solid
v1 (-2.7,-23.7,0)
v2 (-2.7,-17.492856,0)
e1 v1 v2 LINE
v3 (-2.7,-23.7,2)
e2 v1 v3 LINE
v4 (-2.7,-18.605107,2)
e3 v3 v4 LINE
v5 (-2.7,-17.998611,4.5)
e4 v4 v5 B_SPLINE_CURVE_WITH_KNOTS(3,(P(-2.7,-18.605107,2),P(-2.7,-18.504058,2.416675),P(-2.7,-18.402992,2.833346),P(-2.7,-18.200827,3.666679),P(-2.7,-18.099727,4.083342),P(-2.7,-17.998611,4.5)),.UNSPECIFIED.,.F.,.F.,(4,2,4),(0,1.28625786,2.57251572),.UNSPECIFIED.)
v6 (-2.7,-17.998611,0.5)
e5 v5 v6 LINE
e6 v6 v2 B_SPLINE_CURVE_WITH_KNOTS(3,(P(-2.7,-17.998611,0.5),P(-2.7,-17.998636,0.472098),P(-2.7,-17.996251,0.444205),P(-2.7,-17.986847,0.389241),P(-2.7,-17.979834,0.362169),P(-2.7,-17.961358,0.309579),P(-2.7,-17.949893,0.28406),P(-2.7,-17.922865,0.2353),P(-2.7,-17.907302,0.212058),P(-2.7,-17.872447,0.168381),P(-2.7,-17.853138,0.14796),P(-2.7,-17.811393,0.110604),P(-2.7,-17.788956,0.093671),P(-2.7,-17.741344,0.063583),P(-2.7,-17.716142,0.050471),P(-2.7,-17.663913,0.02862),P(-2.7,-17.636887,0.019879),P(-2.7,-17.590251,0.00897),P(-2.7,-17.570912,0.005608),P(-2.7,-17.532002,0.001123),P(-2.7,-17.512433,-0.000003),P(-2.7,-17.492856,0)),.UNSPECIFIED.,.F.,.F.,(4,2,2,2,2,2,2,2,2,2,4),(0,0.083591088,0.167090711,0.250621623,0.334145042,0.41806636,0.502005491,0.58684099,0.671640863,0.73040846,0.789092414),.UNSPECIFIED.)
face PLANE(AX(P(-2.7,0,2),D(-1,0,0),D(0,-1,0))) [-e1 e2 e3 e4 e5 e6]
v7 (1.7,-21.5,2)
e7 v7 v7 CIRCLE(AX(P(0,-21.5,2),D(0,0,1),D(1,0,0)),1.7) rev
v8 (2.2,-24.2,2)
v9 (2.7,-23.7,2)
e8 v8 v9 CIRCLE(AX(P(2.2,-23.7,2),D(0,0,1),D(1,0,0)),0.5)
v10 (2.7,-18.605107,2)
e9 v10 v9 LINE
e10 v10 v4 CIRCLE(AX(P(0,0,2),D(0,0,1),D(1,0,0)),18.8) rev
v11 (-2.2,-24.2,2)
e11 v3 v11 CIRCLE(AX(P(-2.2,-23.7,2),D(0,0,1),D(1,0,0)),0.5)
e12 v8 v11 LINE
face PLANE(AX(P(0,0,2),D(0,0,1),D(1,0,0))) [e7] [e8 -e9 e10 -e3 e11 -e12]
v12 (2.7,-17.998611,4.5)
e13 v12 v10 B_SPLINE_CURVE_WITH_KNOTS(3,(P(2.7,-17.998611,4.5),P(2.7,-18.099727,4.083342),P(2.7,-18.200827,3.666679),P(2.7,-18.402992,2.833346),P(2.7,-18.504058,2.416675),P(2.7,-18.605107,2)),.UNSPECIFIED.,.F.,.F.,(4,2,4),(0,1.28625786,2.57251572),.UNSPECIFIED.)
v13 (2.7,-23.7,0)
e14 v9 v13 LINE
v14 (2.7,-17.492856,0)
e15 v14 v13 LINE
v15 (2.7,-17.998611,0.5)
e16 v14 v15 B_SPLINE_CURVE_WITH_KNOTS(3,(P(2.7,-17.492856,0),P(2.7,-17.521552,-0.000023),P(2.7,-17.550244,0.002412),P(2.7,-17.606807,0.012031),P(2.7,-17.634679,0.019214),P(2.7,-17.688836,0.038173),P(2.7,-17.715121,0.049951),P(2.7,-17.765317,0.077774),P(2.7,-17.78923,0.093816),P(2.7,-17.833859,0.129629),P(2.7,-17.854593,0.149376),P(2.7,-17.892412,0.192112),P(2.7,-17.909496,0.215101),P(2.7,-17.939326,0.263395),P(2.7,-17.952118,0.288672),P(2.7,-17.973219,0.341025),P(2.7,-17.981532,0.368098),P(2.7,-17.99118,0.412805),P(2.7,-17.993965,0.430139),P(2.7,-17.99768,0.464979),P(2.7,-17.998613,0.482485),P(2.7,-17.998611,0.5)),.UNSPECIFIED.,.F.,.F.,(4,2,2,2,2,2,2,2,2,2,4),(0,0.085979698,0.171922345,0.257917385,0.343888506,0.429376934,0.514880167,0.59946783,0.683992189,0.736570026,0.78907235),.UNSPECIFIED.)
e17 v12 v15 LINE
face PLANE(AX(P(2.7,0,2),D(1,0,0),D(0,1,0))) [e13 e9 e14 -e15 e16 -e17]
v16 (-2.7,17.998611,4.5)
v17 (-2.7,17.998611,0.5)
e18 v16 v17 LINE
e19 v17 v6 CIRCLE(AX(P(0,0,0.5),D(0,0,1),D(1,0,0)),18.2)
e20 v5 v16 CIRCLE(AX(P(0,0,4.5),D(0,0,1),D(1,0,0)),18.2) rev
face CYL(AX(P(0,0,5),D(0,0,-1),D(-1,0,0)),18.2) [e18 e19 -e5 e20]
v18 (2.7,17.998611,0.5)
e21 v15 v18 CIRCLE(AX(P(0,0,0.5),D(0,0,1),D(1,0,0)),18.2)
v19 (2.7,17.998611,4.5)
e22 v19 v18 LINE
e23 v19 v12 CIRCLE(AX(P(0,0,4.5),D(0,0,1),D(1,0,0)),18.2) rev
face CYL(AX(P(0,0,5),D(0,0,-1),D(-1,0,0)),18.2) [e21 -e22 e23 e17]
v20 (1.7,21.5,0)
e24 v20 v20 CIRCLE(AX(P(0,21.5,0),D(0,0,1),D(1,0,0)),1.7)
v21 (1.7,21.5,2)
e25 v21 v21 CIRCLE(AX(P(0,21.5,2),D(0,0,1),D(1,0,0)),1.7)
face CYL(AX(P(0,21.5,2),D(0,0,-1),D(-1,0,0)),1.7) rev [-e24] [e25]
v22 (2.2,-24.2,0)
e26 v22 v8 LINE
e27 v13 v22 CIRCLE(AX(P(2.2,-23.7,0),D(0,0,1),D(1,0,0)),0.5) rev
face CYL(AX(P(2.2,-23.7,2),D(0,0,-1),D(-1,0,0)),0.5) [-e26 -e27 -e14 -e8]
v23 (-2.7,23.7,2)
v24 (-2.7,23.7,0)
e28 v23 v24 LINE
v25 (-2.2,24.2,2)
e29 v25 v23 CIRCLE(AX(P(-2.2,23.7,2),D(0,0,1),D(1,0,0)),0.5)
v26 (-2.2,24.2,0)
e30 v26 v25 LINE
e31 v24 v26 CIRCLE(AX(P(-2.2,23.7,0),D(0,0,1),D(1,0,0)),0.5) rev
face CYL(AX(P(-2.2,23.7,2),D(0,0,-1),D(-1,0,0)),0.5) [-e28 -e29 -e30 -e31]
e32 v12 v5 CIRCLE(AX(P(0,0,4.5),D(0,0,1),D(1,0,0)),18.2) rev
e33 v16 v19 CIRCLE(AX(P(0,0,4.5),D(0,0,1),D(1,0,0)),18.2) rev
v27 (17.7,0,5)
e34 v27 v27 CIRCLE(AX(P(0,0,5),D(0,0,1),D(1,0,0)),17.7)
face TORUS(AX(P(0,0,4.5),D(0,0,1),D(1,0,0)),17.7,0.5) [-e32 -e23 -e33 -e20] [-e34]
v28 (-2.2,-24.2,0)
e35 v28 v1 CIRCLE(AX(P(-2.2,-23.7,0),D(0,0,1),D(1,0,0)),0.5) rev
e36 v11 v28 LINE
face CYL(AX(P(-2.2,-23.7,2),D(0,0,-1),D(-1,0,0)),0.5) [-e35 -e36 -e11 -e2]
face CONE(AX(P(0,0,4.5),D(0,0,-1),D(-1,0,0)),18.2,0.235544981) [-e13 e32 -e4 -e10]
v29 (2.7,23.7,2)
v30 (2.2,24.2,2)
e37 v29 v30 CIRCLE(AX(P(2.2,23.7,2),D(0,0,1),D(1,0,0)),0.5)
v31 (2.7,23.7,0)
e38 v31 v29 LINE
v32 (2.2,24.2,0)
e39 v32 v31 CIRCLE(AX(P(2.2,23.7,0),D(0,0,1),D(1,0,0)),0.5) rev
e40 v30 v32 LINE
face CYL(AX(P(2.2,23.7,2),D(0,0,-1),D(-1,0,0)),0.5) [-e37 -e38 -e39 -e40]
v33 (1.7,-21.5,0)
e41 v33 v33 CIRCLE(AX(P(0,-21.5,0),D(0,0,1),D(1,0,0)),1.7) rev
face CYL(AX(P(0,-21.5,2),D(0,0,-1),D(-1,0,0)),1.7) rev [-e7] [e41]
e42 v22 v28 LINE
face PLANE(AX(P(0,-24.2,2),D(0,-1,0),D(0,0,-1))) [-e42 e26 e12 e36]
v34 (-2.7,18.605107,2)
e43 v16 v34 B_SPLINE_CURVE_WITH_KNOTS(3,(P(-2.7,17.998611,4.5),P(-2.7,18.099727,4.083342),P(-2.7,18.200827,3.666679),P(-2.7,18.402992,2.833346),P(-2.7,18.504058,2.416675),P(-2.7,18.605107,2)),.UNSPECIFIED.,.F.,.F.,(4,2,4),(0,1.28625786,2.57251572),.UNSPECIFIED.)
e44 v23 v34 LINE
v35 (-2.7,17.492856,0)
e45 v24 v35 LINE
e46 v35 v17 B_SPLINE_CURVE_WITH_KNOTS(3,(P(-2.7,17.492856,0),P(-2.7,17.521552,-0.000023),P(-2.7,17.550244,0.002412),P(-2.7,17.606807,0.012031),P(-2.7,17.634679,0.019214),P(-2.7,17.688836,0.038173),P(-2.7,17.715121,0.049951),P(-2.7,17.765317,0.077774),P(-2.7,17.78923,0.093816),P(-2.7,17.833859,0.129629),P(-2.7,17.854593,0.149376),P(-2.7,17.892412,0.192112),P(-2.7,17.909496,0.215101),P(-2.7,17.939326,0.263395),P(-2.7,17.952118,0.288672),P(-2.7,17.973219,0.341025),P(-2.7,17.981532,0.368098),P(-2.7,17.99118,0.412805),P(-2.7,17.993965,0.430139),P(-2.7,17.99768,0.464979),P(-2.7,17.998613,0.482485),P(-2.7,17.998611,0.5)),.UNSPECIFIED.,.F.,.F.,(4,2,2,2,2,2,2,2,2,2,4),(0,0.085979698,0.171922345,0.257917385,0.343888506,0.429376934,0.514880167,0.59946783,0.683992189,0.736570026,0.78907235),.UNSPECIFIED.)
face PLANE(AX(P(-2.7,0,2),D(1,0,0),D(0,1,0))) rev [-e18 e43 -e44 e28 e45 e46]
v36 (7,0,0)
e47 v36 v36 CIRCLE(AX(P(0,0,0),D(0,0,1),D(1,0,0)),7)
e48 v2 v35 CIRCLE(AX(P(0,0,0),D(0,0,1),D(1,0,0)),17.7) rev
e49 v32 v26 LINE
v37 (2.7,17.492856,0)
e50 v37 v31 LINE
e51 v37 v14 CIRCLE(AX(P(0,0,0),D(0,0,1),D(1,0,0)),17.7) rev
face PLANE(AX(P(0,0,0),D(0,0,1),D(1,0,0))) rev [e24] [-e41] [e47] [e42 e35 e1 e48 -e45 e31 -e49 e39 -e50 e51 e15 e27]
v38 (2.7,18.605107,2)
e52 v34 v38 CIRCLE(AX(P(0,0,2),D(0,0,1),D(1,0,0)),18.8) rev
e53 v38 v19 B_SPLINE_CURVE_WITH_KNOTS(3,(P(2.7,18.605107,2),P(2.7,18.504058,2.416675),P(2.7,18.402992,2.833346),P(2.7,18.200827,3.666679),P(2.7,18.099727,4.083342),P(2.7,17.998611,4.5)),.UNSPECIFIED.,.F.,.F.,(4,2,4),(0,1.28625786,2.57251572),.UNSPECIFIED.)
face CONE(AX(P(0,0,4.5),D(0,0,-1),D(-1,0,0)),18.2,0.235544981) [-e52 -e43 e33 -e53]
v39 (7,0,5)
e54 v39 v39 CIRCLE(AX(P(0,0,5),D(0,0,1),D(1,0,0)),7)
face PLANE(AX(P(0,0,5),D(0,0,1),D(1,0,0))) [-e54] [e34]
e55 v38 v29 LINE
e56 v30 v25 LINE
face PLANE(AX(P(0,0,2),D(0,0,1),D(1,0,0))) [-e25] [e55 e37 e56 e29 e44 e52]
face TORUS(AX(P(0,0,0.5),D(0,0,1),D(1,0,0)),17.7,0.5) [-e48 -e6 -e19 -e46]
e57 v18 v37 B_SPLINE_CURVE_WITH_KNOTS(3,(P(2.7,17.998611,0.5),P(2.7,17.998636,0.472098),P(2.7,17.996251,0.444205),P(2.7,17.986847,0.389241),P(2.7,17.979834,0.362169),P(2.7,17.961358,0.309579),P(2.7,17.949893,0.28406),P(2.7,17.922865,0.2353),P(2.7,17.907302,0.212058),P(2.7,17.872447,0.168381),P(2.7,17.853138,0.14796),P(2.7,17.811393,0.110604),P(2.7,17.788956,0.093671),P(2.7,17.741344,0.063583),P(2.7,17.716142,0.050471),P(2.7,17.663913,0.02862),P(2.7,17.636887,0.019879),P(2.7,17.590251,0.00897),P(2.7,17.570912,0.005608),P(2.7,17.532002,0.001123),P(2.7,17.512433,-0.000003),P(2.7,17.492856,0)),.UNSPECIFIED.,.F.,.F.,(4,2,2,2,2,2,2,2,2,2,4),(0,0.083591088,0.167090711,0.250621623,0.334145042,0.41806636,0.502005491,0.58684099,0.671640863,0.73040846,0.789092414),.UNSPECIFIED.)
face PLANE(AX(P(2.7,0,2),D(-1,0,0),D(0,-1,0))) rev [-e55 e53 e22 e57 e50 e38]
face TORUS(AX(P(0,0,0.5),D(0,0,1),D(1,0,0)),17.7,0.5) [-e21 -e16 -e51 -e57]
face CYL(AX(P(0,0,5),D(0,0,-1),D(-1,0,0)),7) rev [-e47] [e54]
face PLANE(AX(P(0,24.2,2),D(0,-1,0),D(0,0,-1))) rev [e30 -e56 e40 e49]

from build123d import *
from OCP.BRepFilletAPI import BRepFilletAPI_MakeChamfer

# Parameters (mm, degrees)
CROQUIS2_R              = 18.2
CROQUIS2_R_2            = 7
SALIENTE_EXTRUIR1_DEPTH = 5
CROQUIS2_3_R            = 1.7
SALIENTE_EXTRUIR2_DEPTH = 2
REDONDEO1_R             = 0.5
REDONDEO4_R             = 0.5
CHAFL_N2_SIZE           = 0.6
CHAFL_N2_SIZE_2         = 2.5


with BuildPart() as part:
    # Croquis2 → Saliente-Extruir1 (new body)
    with BuildSketch(Plane(origin=(0, 0, 0), x_dir=(0, 1, 0), z_dir=(0, 0, 1))):
        with Locations(Location((0, 0, 0), (0, 0, 270))):
            Circle(CROQUIS2_R)
        with Locations(Location((0, 0, 0), (0, 0, 270))):
            Circle(CROQUIS2_R_2, mode=Mode.SUBTRACT)
    extrude(amount=SALIENTE_EXTRUIR1_DEPTH)

    # Croquis2<3> → Saliente-Extruir2 (add)
    # profile 1 of 2: a face of its own
    with BuildSketch(Plane(origin=(0, 0, 0), x_dir=(0, 1, 0), z_dir=(0, 0, 1))):
        with BuildLine():
            Line((-24.2, -2.7), (-17.998611058, -2.7))
            ThreePointArc((-17.998611058, -2.7), (-18.2, 0), (-17.998611058, 2.7))
            Line((-17.998611058, 2.7), (-24.2, 2.7))
            Line((-24.2, 2.7), (-24.2, -2.7))
        make_face()
        with Locations(Location((-21.5, 0, 0), (0, 0, 270))):
            Circle(CROQUIS2_3_R, mode=Mode.SUBTRACT)
    # profile 2 of 2: a face of its own
    with BuildSketch(Plane(origin=(0, 0, 0), x_dir=(0, 1, 0), z_dir=(0, 0, 1))):
        with BuildLine():
            ThreePointArc((18.2, 0), (18.149582932, -1.353750116), (17.998611058, -2.7))
            Line((17.998611058, -2.7), (24.2, -2.7))
            Line((24.2, -2.7), (24.2, 2.7))
            Line((24.2, 2.7), (17.998611058, 2.7))
            ThreePointArc((17.998611058, 2.7), (18.149582932, 1.353750116), (18.2, 0))
        make_face()
        with Locations(Location((21.5, 0, 0), (0, 0, 270))):
            Circle(CROQUIS2_3_R, mode=Mode.SUBTRACT)
    extrude(amount=SALIENTE_EXTRUIR2_DEPTH)

    # Redondeo1
    redondeo1_edges = [part.edges().sort_by_distance(p)[0] for p in [
        (-2.7, -24.2, 1),
        (2.7, -24.2, 1),
        (2.7, 24.2, 1),
        (-2.7, 24.2, 1),
    ]]
    fillet(redondeo1_edges, radius=REDONDEO1_R)

    # Redondeo4
    redondeo4_edges = [part.edges().sort_by_distance(p)[0] for p in [
        (13.790939054, 11.87644728, 0),
        (-18.2, 0, 5),
        (-18.2, 0, 0),
    ]]
    fillet(redondeo4_edges, radius=REDONDEO4_R)

    # Chaflán2
    chafl_n2_edges_1 = [part.edges().sort_by_distance(p)[0] for p in [
        (0, -18.2, 2),
    ]]
    chafl_n2_side_1 = [part.faces().sort_by_distance(p)[0] for p in [
        (0, -18.212, 2),
    ]]
    chafl_n2_edges_2 = [part.edges().sort_by_distance(p)[0] for p in [
        (0, 18.2, 2),
    ]]
    chafl_n2_side_2 = [part.faces().sort_by_distance(p)[0] for p in [
        (0, 18.2, 2.012),
    ]]
    chafl_n2 = BRepFilletAPI_MakeChamfer(part.part.solid().wrapped)
    for e in chafl_n2_edges_1:
        chafl_n2.Add(CHAFL_N2_SIZE - 0.0001, CHAFL_N2_SIZE_2 - 0.0001, e.wrapped, chafl_n2_side_1[0].wrapped)
    for e in chafl_n2_edges_2:
        chafl_n2.Add(CHAFL_N2_SIZE_2 - 0.0001, CHAFL_N2_SIZE - 0.0001, e.wrapped, chafl_n2_side_2[0].wrapped)
    add(Compound.cast(chafl_n2.Shape()), mode=Mode.REPLACE)  # a hair under: the kernel refuses the full size


solid = part.part
